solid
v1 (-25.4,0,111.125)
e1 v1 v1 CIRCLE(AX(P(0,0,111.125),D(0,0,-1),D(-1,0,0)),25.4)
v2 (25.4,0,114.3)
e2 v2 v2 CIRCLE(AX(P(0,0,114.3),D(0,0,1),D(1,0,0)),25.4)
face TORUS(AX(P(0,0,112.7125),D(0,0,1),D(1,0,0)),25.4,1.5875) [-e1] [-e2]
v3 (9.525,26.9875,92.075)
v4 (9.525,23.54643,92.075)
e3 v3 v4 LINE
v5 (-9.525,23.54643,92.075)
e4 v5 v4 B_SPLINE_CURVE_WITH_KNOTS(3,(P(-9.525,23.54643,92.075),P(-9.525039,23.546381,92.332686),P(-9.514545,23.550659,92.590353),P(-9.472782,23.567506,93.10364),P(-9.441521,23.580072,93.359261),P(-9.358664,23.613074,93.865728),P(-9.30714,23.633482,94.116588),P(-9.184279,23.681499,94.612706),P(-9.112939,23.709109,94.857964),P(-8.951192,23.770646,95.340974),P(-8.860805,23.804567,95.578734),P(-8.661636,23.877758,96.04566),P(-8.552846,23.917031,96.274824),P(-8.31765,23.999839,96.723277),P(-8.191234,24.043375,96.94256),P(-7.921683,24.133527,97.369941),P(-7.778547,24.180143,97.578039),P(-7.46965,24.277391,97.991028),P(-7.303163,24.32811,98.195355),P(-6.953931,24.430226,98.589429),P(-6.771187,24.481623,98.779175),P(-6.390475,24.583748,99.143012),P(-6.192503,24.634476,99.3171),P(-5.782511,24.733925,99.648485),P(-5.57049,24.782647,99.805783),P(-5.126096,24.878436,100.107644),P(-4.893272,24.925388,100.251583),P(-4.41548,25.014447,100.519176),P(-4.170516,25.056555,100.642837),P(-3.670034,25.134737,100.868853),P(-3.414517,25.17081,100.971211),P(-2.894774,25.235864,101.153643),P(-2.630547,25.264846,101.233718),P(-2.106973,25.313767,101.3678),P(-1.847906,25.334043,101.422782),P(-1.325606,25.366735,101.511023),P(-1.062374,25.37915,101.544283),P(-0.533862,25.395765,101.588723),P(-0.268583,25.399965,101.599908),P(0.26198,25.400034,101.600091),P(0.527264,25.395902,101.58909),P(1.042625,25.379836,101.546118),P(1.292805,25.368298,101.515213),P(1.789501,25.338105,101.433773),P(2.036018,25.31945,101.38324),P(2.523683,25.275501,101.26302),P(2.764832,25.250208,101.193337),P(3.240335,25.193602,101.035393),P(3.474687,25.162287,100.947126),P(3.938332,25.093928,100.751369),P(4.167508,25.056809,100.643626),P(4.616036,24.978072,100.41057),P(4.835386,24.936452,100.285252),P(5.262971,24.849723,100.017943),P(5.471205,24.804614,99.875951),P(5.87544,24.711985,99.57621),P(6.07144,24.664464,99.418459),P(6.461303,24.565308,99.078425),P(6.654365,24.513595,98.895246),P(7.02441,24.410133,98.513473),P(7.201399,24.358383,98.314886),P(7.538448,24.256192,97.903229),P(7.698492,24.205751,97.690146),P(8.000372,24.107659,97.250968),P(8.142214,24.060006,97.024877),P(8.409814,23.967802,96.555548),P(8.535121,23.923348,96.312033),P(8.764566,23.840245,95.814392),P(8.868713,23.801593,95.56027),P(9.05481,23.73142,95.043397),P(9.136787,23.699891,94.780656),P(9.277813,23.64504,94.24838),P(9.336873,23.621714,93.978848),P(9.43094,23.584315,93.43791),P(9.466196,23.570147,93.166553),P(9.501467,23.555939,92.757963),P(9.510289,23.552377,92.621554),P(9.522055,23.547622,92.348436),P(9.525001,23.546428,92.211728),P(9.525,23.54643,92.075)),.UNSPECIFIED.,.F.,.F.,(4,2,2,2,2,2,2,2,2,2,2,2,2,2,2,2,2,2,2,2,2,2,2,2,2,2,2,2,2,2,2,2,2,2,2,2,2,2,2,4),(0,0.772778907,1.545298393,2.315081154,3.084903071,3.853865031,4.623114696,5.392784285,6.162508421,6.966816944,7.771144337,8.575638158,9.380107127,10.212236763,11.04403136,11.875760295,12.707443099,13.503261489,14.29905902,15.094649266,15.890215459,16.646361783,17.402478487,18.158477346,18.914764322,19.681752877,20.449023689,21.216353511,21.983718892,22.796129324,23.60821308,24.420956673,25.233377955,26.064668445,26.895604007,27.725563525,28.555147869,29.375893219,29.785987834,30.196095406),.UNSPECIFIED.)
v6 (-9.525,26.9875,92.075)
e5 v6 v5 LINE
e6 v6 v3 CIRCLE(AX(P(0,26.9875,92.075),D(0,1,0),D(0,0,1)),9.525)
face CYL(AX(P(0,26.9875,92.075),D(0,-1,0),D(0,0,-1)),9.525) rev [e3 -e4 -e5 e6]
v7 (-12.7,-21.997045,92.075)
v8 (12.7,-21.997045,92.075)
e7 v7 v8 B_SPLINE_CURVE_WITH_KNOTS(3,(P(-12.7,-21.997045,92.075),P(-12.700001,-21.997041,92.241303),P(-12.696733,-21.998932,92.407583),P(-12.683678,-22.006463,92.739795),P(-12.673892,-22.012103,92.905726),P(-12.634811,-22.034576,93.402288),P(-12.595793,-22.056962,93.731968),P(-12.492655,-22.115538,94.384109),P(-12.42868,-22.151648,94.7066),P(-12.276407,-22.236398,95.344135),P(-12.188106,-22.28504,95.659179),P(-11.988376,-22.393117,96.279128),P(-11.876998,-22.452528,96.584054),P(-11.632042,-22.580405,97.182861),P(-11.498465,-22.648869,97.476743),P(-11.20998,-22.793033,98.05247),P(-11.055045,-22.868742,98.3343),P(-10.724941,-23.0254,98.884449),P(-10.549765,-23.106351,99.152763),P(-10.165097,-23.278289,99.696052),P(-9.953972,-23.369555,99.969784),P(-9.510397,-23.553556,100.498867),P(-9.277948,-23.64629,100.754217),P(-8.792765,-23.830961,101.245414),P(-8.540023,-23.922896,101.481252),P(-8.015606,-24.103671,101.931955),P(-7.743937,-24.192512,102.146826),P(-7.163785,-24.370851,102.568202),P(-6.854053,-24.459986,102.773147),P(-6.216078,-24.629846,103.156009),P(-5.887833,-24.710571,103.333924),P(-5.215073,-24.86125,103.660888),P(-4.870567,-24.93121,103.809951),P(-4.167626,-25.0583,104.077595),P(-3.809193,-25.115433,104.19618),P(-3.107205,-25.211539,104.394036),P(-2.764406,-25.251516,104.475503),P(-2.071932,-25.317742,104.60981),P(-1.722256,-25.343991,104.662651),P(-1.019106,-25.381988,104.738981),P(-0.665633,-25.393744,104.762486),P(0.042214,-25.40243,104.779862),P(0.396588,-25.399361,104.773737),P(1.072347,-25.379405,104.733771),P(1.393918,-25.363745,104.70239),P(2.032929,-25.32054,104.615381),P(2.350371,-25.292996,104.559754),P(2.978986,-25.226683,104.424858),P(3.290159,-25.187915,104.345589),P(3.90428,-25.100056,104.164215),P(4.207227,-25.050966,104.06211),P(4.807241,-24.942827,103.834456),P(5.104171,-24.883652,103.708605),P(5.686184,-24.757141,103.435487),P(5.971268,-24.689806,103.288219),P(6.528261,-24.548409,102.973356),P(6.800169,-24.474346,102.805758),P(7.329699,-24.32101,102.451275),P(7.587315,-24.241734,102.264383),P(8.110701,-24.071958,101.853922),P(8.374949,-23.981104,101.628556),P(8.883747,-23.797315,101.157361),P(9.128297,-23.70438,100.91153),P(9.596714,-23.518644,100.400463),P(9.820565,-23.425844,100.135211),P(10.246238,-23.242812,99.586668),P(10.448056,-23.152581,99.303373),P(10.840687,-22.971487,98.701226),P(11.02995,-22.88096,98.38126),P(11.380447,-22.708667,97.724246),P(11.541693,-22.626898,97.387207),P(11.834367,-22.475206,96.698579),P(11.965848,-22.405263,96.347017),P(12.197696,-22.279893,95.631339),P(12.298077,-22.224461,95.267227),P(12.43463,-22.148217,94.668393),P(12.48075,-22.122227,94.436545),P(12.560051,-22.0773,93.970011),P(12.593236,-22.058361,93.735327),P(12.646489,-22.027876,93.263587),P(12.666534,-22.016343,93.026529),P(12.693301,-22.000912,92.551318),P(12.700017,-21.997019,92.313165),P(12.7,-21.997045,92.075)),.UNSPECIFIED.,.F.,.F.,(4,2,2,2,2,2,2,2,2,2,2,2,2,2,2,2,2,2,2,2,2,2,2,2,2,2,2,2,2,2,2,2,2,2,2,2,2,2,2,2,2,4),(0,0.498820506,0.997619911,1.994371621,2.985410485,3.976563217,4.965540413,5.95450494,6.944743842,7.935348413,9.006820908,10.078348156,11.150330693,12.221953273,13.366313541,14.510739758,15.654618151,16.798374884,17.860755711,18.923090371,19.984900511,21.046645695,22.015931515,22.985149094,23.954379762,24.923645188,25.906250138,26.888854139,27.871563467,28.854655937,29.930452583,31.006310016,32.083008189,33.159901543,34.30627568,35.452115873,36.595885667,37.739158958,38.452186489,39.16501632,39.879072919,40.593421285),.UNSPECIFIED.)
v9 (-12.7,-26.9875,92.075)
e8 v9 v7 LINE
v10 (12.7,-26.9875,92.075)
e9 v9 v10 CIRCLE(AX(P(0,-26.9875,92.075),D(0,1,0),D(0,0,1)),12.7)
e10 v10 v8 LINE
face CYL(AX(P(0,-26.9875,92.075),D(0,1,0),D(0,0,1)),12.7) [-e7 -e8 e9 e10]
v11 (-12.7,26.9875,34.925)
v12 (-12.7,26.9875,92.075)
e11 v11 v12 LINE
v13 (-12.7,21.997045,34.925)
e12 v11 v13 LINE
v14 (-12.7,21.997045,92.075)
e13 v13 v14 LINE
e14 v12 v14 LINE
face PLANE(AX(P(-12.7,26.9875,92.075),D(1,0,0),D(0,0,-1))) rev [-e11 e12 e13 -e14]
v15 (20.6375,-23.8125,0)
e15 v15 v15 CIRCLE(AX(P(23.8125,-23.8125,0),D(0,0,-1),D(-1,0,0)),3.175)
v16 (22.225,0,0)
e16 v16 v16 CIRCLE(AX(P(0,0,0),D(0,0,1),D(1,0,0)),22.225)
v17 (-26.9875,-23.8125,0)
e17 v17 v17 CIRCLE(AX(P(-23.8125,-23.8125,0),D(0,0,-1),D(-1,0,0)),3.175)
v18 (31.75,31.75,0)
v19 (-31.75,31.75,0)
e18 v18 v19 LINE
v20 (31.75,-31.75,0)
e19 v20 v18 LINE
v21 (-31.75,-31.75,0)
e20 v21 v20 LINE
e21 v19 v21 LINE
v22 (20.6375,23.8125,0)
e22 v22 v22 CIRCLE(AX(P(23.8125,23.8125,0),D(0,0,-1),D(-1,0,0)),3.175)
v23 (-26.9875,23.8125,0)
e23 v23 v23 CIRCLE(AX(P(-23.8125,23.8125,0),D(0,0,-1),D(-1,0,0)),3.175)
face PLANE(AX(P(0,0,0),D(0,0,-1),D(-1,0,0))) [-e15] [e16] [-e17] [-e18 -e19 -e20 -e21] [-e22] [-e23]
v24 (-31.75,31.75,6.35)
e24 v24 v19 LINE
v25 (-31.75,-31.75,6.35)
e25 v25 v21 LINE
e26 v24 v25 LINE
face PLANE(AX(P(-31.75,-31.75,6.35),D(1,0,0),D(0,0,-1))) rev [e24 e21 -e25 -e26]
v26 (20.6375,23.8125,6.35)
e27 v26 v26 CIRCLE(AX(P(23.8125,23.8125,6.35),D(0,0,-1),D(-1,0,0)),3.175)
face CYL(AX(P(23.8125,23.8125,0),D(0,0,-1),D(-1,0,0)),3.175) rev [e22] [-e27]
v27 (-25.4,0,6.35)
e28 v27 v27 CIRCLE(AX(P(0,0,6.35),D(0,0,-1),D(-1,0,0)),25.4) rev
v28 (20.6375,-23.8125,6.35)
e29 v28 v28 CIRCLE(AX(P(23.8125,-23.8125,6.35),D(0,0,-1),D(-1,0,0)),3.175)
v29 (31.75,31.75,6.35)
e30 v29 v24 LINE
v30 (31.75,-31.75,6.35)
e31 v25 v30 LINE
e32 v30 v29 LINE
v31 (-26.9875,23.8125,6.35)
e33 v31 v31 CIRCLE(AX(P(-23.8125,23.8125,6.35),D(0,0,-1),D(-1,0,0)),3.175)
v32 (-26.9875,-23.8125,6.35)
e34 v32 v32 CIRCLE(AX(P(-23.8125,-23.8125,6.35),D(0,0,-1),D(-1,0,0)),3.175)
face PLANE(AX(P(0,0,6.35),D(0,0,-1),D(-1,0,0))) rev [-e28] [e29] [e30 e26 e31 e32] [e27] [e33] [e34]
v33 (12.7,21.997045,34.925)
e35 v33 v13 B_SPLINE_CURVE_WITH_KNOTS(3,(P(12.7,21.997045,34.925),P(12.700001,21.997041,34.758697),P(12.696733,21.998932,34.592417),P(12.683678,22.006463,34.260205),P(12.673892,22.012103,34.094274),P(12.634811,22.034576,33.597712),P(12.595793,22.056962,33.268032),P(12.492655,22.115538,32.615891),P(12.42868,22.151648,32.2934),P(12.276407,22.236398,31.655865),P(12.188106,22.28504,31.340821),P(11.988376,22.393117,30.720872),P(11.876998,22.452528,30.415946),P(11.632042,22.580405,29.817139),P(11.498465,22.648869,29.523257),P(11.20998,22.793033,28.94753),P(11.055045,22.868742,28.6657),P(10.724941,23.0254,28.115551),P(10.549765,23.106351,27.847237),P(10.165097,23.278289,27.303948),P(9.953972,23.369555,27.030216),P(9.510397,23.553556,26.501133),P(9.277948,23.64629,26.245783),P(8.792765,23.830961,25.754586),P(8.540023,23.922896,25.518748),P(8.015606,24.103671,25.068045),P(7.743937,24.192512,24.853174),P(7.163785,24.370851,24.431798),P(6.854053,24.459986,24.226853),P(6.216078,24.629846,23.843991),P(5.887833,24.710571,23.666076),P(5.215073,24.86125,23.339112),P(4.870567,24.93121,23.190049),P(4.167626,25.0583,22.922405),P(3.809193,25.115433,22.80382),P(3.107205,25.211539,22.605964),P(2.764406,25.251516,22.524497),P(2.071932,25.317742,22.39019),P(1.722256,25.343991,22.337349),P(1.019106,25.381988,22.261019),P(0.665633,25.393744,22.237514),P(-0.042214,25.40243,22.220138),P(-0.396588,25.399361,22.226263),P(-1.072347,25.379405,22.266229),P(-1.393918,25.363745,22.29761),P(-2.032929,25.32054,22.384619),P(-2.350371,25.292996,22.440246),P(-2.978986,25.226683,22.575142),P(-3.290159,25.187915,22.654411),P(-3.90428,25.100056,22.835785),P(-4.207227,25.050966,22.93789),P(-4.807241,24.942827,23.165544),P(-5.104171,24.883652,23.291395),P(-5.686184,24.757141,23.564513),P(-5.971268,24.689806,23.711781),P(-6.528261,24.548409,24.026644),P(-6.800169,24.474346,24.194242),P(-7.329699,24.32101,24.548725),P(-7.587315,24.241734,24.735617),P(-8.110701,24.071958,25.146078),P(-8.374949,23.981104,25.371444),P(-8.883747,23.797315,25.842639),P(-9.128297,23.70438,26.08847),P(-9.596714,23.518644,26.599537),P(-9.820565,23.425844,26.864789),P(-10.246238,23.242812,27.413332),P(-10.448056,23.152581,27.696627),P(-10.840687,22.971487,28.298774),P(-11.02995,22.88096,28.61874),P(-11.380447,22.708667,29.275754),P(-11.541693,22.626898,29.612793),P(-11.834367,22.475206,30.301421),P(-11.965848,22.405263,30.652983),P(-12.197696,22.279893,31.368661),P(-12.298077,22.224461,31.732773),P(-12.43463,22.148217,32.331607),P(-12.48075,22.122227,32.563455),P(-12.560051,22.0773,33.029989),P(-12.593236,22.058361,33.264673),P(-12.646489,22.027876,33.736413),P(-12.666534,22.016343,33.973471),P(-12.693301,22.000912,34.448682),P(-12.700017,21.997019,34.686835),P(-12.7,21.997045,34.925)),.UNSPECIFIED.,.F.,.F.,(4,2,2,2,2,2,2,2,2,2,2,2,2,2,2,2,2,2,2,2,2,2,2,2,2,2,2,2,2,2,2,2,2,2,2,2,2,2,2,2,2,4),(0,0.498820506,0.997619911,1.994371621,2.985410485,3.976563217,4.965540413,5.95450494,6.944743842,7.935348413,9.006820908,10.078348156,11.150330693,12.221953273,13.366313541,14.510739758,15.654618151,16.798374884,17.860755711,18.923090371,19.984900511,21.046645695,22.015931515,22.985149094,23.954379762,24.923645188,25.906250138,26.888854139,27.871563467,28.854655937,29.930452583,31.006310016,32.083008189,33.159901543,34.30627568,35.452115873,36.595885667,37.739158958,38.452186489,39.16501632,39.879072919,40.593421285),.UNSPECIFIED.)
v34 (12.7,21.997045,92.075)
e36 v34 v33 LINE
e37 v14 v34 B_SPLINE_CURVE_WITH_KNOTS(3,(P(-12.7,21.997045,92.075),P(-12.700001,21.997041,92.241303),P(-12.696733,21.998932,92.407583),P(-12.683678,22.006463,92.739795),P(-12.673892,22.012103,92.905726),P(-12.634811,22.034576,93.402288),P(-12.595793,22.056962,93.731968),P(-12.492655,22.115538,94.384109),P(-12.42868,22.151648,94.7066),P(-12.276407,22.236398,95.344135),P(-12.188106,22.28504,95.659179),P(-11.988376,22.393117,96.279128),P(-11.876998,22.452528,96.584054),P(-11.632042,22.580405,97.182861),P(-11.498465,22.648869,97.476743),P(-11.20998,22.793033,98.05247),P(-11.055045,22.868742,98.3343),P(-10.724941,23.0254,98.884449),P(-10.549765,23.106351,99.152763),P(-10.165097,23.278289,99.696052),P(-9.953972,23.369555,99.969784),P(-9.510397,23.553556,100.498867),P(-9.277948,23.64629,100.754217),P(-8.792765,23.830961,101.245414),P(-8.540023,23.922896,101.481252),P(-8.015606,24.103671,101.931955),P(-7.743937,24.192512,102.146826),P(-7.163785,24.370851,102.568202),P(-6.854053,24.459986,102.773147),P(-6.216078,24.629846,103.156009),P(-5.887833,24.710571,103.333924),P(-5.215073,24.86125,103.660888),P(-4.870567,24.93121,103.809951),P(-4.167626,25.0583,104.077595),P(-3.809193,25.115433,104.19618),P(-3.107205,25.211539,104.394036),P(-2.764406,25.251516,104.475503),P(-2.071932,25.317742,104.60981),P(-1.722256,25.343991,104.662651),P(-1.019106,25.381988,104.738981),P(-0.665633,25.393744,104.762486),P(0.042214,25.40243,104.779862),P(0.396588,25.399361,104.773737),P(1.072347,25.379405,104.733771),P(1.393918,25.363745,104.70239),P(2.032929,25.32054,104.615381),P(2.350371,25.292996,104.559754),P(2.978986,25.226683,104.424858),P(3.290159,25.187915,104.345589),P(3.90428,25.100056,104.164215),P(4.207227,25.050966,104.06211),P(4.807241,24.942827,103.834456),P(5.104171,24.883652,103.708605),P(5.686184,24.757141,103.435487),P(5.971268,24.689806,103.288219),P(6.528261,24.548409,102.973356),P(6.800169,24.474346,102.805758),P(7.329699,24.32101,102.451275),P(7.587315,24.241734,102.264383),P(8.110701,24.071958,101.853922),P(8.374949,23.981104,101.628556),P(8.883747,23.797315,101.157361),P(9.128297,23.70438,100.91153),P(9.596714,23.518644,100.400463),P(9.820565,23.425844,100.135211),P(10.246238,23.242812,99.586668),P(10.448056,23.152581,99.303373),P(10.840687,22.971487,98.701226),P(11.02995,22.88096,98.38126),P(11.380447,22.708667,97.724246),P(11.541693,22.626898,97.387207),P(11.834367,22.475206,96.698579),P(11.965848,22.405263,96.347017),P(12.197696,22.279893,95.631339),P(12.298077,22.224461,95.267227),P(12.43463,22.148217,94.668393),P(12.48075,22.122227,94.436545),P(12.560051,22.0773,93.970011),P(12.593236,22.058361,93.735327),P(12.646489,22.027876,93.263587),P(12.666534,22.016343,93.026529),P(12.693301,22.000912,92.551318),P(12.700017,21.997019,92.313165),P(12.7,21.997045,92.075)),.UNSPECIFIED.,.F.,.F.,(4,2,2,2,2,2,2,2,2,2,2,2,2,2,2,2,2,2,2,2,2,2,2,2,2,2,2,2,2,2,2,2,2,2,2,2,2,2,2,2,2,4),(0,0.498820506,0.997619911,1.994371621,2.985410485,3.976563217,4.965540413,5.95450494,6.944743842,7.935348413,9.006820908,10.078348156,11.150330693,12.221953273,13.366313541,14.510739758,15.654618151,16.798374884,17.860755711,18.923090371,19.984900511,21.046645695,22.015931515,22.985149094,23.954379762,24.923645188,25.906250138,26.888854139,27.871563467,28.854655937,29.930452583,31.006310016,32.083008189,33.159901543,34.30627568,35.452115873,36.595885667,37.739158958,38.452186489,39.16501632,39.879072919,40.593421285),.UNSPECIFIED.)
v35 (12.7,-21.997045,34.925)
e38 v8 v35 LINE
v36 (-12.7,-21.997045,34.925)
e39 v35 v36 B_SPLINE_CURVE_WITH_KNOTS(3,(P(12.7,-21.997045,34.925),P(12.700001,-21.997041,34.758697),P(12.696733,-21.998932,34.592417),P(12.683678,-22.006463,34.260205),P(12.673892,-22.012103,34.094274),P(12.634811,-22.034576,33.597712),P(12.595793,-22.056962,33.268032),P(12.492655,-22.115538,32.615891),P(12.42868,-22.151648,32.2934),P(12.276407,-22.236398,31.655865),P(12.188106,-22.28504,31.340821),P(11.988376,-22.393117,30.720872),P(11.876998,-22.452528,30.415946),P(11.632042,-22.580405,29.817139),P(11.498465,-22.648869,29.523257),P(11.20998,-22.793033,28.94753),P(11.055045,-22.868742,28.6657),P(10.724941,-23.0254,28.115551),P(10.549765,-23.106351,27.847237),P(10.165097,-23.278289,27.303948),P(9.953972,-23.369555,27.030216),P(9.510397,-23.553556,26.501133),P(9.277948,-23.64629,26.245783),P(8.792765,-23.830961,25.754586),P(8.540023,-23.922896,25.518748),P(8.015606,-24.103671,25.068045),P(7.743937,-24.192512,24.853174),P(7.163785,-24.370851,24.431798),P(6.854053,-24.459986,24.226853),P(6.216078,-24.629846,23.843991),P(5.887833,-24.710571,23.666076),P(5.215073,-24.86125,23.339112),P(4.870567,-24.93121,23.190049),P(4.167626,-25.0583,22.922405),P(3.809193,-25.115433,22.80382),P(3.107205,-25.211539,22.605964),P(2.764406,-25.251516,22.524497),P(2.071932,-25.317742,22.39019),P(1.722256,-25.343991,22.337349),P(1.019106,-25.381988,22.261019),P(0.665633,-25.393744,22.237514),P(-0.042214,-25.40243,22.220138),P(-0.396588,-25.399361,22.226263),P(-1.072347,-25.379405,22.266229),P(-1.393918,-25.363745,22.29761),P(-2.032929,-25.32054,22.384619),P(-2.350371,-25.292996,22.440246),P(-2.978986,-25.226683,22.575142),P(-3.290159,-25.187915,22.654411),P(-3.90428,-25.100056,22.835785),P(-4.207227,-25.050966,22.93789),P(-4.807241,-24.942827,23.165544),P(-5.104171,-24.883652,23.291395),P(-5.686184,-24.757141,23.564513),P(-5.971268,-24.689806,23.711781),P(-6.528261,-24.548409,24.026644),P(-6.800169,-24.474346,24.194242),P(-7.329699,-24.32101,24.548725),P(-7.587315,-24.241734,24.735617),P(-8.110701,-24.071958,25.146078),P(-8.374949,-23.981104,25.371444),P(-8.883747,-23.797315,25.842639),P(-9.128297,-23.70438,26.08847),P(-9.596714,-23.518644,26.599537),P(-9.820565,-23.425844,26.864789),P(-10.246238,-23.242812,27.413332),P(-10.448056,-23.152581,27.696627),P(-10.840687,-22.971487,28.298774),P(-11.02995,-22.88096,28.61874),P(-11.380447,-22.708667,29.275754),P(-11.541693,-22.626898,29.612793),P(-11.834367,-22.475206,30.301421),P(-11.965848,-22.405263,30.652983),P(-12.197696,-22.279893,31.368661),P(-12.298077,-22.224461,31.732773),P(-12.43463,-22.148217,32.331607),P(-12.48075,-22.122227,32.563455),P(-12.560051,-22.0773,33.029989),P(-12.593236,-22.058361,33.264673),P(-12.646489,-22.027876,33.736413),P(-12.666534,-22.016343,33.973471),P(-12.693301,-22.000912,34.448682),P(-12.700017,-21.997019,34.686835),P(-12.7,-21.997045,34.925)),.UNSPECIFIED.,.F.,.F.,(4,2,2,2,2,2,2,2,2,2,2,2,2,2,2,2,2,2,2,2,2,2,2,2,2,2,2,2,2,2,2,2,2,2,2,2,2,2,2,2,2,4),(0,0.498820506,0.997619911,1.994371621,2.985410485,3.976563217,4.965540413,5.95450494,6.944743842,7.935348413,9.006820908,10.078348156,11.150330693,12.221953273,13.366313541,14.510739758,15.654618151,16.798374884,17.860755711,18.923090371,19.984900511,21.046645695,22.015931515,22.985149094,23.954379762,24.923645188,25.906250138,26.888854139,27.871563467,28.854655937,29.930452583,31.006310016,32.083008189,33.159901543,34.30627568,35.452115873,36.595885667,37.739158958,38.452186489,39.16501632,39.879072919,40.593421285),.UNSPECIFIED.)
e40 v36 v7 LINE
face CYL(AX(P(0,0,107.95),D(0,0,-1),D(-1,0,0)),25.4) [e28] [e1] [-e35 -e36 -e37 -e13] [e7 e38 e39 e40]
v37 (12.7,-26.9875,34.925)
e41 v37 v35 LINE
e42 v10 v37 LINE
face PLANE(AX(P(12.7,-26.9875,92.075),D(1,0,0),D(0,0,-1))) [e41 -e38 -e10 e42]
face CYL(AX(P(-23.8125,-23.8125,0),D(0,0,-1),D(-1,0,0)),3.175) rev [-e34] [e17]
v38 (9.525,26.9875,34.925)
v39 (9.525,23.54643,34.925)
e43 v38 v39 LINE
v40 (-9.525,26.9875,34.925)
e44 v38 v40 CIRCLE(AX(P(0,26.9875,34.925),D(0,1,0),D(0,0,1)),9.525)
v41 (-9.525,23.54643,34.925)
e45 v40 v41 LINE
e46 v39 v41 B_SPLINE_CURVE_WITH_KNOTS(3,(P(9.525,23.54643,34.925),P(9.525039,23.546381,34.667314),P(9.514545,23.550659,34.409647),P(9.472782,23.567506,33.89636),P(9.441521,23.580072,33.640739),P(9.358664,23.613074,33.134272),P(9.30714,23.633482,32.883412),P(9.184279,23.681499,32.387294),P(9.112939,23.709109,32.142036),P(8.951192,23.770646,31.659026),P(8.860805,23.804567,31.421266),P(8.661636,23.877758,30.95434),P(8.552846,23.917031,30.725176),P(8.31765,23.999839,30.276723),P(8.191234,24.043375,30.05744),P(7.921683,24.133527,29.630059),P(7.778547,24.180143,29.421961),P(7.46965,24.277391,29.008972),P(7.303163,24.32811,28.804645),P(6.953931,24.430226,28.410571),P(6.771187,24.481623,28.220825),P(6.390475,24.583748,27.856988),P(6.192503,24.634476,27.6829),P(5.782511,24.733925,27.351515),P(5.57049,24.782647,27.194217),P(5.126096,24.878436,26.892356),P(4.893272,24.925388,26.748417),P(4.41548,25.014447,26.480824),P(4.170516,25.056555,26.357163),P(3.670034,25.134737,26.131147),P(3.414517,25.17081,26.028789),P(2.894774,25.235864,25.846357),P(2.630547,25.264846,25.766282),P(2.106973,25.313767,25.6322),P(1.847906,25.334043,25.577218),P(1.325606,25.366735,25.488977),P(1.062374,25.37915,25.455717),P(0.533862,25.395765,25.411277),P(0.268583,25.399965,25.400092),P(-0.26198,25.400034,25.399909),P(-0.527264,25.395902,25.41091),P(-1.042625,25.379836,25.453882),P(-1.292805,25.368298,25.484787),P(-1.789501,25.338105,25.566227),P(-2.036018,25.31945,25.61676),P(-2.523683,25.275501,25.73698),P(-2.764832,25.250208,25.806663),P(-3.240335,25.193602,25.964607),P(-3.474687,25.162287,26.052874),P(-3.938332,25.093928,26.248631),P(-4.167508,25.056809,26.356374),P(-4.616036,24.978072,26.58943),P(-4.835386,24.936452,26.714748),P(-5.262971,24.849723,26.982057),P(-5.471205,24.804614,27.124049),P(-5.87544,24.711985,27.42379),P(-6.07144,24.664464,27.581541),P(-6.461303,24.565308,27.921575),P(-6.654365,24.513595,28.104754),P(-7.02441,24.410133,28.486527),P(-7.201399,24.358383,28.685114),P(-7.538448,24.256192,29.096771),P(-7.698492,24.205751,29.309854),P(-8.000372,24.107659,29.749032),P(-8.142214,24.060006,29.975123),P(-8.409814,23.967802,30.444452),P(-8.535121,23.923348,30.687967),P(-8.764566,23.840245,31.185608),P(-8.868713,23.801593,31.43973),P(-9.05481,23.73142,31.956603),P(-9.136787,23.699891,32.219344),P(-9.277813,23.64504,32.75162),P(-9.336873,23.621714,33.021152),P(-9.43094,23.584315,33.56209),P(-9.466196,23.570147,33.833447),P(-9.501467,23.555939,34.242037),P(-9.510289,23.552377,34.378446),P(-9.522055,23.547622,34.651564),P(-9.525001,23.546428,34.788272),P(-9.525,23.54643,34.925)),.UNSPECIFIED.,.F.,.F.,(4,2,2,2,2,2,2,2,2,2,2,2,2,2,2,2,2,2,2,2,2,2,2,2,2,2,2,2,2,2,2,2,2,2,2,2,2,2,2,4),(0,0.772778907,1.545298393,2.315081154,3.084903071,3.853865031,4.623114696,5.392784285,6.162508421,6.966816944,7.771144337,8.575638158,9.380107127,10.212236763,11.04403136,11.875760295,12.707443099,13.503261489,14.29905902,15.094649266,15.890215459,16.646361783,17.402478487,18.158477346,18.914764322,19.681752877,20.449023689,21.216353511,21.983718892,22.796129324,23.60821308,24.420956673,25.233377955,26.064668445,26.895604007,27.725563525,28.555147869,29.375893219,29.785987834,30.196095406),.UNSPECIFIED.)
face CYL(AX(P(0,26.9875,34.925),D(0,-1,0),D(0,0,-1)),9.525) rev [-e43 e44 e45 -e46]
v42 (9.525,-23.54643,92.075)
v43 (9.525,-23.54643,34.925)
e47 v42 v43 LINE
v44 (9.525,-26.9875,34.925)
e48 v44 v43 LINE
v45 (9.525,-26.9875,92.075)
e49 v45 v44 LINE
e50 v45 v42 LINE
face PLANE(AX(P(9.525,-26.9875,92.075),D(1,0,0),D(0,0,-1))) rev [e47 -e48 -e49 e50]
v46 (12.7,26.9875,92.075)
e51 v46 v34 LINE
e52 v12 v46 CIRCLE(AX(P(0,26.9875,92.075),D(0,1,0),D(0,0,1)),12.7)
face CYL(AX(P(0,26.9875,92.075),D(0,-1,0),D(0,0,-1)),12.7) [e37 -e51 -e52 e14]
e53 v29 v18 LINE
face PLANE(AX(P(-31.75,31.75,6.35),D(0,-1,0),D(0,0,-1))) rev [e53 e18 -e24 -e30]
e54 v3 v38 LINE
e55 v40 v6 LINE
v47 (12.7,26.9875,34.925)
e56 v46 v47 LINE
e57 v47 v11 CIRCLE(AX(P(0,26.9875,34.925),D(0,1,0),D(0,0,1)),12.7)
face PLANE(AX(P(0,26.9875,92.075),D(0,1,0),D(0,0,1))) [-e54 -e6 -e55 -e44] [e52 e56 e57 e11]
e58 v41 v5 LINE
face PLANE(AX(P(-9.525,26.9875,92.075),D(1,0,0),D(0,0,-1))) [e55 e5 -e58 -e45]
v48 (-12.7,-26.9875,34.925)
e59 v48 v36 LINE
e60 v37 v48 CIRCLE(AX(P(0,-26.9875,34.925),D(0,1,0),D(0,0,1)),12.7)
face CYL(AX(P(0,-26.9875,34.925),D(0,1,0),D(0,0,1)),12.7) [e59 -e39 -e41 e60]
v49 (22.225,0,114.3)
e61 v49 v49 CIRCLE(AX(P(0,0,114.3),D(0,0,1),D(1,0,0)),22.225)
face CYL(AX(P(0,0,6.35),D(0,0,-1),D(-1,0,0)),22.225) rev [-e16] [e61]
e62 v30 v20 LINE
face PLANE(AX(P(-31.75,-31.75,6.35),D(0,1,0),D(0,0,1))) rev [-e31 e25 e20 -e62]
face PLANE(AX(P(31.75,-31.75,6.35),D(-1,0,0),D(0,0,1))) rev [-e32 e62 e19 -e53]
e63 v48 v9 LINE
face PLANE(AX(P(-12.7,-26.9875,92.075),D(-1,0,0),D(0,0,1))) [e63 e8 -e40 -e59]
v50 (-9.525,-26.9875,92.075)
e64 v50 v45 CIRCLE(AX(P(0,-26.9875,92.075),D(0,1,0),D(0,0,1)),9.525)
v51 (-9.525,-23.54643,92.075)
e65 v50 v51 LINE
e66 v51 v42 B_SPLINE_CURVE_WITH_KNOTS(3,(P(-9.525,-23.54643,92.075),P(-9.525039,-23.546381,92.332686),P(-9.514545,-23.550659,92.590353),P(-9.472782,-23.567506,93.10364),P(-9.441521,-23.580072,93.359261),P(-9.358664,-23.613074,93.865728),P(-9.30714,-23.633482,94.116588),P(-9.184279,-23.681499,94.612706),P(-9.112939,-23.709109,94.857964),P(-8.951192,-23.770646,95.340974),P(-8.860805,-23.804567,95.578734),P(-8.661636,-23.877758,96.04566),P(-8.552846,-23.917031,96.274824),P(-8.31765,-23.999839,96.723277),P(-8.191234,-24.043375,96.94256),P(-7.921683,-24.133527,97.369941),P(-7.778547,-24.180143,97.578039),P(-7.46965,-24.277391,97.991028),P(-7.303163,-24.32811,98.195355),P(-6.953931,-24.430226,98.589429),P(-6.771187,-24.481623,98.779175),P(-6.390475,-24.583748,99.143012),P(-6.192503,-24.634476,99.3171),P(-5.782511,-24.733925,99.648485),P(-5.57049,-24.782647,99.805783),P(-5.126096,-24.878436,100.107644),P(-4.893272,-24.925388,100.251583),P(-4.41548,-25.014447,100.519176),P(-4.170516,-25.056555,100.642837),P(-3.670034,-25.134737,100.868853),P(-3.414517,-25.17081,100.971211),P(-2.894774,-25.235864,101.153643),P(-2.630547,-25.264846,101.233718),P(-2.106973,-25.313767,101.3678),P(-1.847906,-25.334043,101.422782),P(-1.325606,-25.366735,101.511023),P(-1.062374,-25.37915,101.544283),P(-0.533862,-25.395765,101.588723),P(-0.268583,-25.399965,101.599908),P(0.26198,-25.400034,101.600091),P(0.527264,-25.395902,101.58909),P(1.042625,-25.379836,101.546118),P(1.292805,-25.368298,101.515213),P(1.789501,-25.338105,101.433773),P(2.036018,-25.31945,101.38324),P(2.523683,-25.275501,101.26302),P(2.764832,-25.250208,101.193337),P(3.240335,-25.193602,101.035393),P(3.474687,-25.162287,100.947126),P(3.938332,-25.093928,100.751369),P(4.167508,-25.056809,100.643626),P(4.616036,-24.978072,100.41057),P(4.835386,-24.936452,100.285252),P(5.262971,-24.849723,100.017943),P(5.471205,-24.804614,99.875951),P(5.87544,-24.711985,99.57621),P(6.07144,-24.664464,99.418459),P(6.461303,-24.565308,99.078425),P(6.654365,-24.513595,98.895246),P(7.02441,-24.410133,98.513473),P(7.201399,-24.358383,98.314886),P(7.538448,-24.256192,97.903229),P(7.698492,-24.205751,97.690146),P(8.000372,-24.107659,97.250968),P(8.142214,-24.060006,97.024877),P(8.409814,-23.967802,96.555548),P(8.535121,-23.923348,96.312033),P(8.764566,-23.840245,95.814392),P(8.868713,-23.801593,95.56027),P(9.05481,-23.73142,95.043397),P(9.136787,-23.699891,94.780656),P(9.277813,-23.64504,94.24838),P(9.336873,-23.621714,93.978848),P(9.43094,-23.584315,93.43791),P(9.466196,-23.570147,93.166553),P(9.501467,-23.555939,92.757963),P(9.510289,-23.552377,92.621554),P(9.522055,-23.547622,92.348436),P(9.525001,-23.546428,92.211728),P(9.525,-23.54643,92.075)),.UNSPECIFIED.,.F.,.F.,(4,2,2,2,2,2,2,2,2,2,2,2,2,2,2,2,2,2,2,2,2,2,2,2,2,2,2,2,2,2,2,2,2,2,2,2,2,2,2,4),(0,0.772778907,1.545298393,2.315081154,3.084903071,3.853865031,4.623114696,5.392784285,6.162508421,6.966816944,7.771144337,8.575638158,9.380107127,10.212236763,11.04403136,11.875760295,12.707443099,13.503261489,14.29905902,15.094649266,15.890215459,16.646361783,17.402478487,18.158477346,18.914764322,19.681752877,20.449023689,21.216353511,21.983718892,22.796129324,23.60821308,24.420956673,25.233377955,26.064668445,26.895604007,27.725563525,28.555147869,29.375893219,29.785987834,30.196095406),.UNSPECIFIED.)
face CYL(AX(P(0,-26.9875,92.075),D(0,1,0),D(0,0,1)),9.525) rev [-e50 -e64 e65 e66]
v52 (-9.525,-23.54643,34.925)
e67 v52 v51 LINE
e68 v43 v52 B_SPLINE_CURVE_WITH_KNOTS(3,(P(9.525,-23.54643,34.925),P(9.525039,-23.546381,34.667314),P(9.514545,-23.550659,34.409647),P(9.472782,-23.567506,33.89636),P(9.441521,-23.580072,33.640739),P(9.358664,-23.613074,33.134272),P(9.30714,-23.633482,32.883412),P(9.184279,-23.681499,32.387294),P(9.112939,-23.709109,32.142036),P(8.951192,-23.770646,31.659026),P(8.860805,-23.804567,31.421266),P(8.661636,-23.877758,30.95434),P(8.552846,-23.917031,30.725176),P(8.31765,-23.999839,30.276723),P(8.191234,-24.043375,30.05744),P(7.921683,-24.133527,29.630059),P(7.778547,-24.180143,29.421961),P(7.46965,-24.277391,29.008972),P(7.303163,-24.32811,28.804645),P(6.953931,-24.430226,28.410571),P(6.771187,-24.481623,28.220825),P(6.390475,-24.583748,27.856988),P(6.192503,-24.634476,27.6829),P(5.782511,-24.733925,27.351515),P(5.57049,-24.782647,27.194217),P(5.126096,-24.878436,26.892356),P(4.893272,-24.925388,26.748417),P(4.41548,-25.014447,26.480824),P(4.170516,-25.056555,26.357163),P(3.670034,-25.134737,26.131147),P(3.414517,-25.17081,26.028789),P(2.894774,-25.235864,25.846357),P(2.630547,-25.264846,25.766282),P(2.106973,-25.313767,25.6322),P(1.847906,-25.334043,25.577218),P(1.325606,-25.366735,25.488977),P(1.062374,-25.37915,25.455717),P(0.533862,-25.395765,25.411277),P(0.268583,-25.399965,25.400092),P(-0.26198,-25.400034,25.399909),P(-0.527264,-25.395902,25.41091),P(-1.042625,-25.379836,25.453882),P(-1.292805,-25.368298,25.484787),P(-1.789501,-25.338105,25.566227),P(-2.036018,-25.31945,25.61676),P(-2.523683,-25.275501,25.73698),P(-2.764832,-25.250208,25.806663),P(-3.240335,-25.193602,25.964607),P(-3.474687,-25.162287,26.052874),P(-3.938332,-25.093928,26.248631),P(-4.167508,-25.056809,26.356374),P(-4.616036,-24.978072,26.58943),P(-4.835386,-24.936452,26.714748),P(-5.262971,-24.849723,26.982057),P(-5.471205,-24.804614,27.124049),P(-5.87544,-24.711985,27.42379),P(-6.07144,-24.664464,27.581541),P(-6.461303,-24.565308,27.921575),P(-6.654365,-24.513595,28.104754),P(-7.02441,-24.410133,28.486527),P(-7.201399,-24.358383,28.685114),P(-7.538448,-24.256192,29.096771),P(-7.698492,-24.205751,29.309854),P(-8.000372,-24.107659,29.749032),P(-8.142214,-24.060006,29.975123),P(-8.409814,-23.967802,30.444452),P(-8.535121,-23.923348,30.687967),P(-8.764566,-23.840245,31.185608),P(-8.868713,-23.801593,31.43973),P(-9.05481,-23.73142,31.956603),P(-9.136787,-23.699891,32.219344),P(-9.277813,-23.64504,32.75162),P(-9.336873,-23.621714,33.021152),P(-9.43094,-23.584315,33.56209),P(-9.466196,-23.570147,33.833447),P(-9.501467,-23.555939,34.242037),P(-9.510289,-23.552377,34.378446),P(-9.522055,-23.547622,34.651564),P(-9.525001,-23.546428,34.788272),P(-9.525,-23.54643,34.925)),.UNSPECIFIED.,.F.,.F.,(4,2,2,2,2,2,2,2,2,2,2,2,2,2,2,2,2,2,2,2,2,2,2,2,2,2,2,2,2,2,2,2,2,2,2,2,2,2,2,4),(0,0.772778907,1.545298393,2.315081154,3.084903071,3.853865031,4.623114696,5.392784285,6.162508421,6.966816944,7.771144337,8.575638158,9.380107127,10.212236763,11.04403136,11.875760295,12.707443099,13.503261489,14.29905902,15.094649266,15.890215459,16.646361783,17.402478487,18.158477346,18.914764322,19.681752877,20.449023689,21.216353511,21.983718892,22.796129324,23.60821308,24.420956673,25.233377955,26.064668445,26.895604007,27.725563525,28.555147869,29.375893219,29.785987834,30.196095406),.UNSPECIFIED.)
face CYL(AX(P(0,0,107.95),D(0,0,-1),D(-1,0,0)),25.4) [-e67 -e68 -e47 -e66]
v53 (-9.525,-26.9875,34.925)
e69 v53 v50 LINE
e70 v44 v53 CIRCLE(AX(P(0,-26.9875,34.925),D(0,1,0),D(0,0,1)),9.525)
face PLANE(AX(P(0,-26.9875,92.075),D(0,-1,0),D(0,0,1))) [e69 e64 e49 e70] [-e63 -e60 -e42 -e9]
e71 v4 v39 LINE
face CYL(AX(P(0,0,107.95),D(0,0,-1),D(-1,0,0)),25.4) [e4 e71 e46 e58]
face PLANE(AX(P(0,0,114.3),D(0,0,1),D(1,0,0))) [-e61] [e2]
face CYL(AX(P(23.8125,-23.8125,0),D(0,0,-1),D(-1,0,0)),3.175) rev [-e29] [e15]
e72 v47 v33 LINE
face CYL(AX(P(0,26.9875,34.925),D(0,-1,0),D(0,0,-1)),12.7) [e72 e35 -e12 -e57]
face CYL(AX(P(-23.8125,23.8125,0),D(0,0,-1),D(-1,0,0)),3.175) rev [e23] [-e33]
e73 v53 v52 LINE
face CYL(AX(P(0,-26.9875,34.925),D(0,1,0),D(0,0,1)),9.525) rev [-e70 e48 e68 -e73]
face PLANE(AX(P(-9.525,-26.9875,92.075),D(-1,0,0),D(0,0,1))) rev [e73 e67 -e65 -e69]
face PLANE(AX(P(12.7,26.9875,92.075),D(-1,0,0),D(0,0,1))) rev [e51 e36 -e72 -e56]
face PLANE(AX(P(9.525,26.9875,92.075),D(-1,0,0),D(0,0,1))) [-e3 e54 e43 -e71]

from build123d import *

# Parameters (mm, degrees)
SKETCH2_W                     = 63.5
SKETCH2_H                     = 63.5
SKETCH2_R                     = 22.225
BOSS_EXTRUDE1_DEPTH           = 6.35
SKETCH3_R                     = 25.4
SKETCH3_R_2                   = 22.225
BOSS_EXTRUDE2_DEPTH           = 101.6
SKETCH4_W                     = 63.5
SKETCH4_H                     = 63.5
SKETCH4_R                     = 22.225
BOSS_EXTRUDE3_DEPTH           = 6.35
F_3_0_25_DIAMETER_HOLE1_D     = 6.35
F_3_0_25_DIAMETER_HOLE1_DEPTH = 6.35
SKETCH8_W                     = 63.5
SKETCH8_H                     = 63.5
CUT_EXTRUDE1_DEPTH            = 3.175
BOSS_EXTRUDE4_REACH           = 118.916
SKETCH9_R                     = 25.4
SKETCH9_R_2                   = 22.225
SKETCH10_OUTSIDE_W            = 94.572
SKETCH10_OUTSIDE_H            = 94.572
SKETCH10_OUTSIDE_R            = 26.9875
CUT_EXTRUDE2_DEPTH            = 3.175
FILLET1_R                     = 1.5875
BOSS_EXTRUDE5_DEPTH           = 26.9875
CUT_EXTRUDE3_DEPTH            = 123.80315559
CUT_EXTRUDE3_DEPTH_BACK       = 123.80315559
SKETCH12_R                    = 22.225


with BuildPart() as part:
    # Sketch2 → Boss-Extrude1 (new body)
    with BuildSketch(Plane.XY):
        Rectangle(SKETCH2_W, SKETCH2_H)
        Circle(SKETCH2_R, mode=Mode.SUBTRACT)
    extrude(amount=BOSS_EXTRUDE1_DEPTH)

    # Sketch3 → Boss-Extrude2 (add)
    with BuildSketch(Plane.XY.offset(6.35)):
        with Locations(Location((0, 0, 0), (0, 0, 180))):
            Circle(SKETCH3_R)
        Circle(SKETCH3_R_2, mode=Mode.SUBTRACT)
    extrude(amount=BOSS_EXTRUDE2_DEPTH)

    # Sketch4 → Boss-Extrude3 (add)
    with BuildSketch(Plane.XY.offset(107.95)):
        Rectangle(SKETCH4_W, SKETCH4_H)
        Circle(SKETCH4_R, mode=Mode.SUBTRACT)
    extrude(amount=BOSS_EXTRUDE3_DEPTH)

    # #3 (0.25) Diameter Hole1
    with Locations(Plane(origin=(0, 0, 0), x_dir=(-1, 0, 0), z_dir=(0, 0, -1))):
        with Locations((-23.8125, 23.8125), (-23.8125, -23.8125), (23.8125, -23.8125), (23.8125, 23.8125)):
            Hole(F_3_0_25_DIAMETER_HOLE1_D / 2, depth=F_3_0_25_DIAMETER_HOLE1_DEPTH)

    # Sketch8 → Cut-Extrude1 (cut)
    with BuildSketch(Plane(origin=(0, 0, 107.95), x_dir=(-1, 0, 0), z_dir=(0, 0, -1))):
        Rectangle(SKETCH8_W, SKETCH8_H)
    extrude(amount=-CUT_EXTRUDE1_DEPTH, mode=Mode.SUBTRACT)


with BuildPart() as cut_extrude1_piece_1:
    # of the separate pieces the step leaves, piece 1, a body of its own (cut_extrude1_pieces)
    add(part.part.solids().sort_by_distance((-31.75, -31.75, 0))[0])


with BuildPart() as cut_extrude1_piece_2:
    # of the separate pieces the step leaves, piece 2, a body of its own (cut_extrude1_pieces)
    add(part.part.solids().sort_by_distance((22.225, 0, 111.125))[0])

    # Sketch9 → Boss-Extrude4 (add, up to next)
    with BuildSketch(Plane.XY.offset(107.95), mode=Mode.PRIVATE) as boss_extrude4_sk1:
        with Locations(Location((0, 0, 0), (0, 0, 180))):
            Circle(SKETCH9_R)
        Circle(SKETCH9_R_2, mode=Mode.SUBTRACT)
    boss_extrude4_tool1 = extrude(boss_extrude4_sk1.sketch, amount=BOSS_EXTRUDE4_REACH, mode=Mode.PRIVATE) - cut_extrude1_piece_2.part

    add(cut_extrude1_piece_1.part)  # Boss-Extrude4 merges Cut-Extrude1 piece 1
    add(boss_extrude4_tool1.solids().sort_by_distance((24.68158, 0, 107.95))[0])

    # Sketch10 outside → Cut-Extrude2 (cut)
    with BuildSketch(Plane.XY.offset(114.3)):
        Rectangle(SKETCH10_OUTSIDE_W, SKETCH10_OUTSIDE_H)
        Circle(SKETCH10_OUTSIDE_R, mode=Mode.SUBTRACT)
    extrude(amount=-CUT_EXTRUDE2_DEPTH, mode=Mode.SUBTRACT)

    # Fillet1
    fillet1_edges = [cut_extrude1_piece_2.edges().sort_by_distance(p)[0] for p in [
        (-26.9875, 0, 111.125),
        (-26.9875, 0, 114.3),
    ]]
    fillet(fillet1_edges, radius=FILLET1_R - 0.0001)  # a hair under: the kernel refuses the full size

    # Sketch11 → Boss-Extrude5 (add)
    with BuildSketch(Plane(origin=(0, 0, 0), x_dir=(1, 0, 0), z_dir=(0, 1, 0))):
        with BuildLine():
            Line((-12.7, -92.075), (-12.7, -34.925))
            ThreePointArc((-12.7, -34.925), (0, -22.225), (12.7, -34.925))
            Line((12.7, -34.925), (12.7, -92.075))
            ThreePointArc((12.7, -92.075), (0, -104.775), (-12.7, -92.075))
        make_face()
        with BuildLine():
            Line((-9.525, -92.075), (-9.525, -34.925))
            ThreePointArc((-9.525, -34.925), (0, -25.4), (9.525, -34.925))
            Line((9.525, -34.925), (9.525, -92.075))
            ThreePointArc((9.525, -92.075), (0, -101.6), (-9.525, -92.075))
        make_face(mode=Mode.SUBTRACT)
    boss_extrude5 = extrude(amount=BOSS_EXTRUDE5_DEPTH)

    # Mirror1: Boss-Extrude5 across plane
    add(boss_extrude5.mirror(Plane.ZX))

    # Sketch12 → Cut-Extrude3 (cut, two sides: drawn at the far end of the back side and taken through both)
    with BuildSketch(Plane(origin=(0, 0, 0), x_dir=(-1, 0, 0), z_dir=(0, 0, -1)).offset(-CUT_EXTRUDE3_DEPTH_BACK)):
        with Locations(Location((0, 0, 0), (0, 0, 180))):
            Circle(SKETCH12_R)
    extrude(amount=CUT_EXTRUDE3_DEPTH + CUT_EXTRUDE3_DEPTH_BACK, mode=Mode.SUBTRACT)


solid = cut_extrude1_piece_2.part
